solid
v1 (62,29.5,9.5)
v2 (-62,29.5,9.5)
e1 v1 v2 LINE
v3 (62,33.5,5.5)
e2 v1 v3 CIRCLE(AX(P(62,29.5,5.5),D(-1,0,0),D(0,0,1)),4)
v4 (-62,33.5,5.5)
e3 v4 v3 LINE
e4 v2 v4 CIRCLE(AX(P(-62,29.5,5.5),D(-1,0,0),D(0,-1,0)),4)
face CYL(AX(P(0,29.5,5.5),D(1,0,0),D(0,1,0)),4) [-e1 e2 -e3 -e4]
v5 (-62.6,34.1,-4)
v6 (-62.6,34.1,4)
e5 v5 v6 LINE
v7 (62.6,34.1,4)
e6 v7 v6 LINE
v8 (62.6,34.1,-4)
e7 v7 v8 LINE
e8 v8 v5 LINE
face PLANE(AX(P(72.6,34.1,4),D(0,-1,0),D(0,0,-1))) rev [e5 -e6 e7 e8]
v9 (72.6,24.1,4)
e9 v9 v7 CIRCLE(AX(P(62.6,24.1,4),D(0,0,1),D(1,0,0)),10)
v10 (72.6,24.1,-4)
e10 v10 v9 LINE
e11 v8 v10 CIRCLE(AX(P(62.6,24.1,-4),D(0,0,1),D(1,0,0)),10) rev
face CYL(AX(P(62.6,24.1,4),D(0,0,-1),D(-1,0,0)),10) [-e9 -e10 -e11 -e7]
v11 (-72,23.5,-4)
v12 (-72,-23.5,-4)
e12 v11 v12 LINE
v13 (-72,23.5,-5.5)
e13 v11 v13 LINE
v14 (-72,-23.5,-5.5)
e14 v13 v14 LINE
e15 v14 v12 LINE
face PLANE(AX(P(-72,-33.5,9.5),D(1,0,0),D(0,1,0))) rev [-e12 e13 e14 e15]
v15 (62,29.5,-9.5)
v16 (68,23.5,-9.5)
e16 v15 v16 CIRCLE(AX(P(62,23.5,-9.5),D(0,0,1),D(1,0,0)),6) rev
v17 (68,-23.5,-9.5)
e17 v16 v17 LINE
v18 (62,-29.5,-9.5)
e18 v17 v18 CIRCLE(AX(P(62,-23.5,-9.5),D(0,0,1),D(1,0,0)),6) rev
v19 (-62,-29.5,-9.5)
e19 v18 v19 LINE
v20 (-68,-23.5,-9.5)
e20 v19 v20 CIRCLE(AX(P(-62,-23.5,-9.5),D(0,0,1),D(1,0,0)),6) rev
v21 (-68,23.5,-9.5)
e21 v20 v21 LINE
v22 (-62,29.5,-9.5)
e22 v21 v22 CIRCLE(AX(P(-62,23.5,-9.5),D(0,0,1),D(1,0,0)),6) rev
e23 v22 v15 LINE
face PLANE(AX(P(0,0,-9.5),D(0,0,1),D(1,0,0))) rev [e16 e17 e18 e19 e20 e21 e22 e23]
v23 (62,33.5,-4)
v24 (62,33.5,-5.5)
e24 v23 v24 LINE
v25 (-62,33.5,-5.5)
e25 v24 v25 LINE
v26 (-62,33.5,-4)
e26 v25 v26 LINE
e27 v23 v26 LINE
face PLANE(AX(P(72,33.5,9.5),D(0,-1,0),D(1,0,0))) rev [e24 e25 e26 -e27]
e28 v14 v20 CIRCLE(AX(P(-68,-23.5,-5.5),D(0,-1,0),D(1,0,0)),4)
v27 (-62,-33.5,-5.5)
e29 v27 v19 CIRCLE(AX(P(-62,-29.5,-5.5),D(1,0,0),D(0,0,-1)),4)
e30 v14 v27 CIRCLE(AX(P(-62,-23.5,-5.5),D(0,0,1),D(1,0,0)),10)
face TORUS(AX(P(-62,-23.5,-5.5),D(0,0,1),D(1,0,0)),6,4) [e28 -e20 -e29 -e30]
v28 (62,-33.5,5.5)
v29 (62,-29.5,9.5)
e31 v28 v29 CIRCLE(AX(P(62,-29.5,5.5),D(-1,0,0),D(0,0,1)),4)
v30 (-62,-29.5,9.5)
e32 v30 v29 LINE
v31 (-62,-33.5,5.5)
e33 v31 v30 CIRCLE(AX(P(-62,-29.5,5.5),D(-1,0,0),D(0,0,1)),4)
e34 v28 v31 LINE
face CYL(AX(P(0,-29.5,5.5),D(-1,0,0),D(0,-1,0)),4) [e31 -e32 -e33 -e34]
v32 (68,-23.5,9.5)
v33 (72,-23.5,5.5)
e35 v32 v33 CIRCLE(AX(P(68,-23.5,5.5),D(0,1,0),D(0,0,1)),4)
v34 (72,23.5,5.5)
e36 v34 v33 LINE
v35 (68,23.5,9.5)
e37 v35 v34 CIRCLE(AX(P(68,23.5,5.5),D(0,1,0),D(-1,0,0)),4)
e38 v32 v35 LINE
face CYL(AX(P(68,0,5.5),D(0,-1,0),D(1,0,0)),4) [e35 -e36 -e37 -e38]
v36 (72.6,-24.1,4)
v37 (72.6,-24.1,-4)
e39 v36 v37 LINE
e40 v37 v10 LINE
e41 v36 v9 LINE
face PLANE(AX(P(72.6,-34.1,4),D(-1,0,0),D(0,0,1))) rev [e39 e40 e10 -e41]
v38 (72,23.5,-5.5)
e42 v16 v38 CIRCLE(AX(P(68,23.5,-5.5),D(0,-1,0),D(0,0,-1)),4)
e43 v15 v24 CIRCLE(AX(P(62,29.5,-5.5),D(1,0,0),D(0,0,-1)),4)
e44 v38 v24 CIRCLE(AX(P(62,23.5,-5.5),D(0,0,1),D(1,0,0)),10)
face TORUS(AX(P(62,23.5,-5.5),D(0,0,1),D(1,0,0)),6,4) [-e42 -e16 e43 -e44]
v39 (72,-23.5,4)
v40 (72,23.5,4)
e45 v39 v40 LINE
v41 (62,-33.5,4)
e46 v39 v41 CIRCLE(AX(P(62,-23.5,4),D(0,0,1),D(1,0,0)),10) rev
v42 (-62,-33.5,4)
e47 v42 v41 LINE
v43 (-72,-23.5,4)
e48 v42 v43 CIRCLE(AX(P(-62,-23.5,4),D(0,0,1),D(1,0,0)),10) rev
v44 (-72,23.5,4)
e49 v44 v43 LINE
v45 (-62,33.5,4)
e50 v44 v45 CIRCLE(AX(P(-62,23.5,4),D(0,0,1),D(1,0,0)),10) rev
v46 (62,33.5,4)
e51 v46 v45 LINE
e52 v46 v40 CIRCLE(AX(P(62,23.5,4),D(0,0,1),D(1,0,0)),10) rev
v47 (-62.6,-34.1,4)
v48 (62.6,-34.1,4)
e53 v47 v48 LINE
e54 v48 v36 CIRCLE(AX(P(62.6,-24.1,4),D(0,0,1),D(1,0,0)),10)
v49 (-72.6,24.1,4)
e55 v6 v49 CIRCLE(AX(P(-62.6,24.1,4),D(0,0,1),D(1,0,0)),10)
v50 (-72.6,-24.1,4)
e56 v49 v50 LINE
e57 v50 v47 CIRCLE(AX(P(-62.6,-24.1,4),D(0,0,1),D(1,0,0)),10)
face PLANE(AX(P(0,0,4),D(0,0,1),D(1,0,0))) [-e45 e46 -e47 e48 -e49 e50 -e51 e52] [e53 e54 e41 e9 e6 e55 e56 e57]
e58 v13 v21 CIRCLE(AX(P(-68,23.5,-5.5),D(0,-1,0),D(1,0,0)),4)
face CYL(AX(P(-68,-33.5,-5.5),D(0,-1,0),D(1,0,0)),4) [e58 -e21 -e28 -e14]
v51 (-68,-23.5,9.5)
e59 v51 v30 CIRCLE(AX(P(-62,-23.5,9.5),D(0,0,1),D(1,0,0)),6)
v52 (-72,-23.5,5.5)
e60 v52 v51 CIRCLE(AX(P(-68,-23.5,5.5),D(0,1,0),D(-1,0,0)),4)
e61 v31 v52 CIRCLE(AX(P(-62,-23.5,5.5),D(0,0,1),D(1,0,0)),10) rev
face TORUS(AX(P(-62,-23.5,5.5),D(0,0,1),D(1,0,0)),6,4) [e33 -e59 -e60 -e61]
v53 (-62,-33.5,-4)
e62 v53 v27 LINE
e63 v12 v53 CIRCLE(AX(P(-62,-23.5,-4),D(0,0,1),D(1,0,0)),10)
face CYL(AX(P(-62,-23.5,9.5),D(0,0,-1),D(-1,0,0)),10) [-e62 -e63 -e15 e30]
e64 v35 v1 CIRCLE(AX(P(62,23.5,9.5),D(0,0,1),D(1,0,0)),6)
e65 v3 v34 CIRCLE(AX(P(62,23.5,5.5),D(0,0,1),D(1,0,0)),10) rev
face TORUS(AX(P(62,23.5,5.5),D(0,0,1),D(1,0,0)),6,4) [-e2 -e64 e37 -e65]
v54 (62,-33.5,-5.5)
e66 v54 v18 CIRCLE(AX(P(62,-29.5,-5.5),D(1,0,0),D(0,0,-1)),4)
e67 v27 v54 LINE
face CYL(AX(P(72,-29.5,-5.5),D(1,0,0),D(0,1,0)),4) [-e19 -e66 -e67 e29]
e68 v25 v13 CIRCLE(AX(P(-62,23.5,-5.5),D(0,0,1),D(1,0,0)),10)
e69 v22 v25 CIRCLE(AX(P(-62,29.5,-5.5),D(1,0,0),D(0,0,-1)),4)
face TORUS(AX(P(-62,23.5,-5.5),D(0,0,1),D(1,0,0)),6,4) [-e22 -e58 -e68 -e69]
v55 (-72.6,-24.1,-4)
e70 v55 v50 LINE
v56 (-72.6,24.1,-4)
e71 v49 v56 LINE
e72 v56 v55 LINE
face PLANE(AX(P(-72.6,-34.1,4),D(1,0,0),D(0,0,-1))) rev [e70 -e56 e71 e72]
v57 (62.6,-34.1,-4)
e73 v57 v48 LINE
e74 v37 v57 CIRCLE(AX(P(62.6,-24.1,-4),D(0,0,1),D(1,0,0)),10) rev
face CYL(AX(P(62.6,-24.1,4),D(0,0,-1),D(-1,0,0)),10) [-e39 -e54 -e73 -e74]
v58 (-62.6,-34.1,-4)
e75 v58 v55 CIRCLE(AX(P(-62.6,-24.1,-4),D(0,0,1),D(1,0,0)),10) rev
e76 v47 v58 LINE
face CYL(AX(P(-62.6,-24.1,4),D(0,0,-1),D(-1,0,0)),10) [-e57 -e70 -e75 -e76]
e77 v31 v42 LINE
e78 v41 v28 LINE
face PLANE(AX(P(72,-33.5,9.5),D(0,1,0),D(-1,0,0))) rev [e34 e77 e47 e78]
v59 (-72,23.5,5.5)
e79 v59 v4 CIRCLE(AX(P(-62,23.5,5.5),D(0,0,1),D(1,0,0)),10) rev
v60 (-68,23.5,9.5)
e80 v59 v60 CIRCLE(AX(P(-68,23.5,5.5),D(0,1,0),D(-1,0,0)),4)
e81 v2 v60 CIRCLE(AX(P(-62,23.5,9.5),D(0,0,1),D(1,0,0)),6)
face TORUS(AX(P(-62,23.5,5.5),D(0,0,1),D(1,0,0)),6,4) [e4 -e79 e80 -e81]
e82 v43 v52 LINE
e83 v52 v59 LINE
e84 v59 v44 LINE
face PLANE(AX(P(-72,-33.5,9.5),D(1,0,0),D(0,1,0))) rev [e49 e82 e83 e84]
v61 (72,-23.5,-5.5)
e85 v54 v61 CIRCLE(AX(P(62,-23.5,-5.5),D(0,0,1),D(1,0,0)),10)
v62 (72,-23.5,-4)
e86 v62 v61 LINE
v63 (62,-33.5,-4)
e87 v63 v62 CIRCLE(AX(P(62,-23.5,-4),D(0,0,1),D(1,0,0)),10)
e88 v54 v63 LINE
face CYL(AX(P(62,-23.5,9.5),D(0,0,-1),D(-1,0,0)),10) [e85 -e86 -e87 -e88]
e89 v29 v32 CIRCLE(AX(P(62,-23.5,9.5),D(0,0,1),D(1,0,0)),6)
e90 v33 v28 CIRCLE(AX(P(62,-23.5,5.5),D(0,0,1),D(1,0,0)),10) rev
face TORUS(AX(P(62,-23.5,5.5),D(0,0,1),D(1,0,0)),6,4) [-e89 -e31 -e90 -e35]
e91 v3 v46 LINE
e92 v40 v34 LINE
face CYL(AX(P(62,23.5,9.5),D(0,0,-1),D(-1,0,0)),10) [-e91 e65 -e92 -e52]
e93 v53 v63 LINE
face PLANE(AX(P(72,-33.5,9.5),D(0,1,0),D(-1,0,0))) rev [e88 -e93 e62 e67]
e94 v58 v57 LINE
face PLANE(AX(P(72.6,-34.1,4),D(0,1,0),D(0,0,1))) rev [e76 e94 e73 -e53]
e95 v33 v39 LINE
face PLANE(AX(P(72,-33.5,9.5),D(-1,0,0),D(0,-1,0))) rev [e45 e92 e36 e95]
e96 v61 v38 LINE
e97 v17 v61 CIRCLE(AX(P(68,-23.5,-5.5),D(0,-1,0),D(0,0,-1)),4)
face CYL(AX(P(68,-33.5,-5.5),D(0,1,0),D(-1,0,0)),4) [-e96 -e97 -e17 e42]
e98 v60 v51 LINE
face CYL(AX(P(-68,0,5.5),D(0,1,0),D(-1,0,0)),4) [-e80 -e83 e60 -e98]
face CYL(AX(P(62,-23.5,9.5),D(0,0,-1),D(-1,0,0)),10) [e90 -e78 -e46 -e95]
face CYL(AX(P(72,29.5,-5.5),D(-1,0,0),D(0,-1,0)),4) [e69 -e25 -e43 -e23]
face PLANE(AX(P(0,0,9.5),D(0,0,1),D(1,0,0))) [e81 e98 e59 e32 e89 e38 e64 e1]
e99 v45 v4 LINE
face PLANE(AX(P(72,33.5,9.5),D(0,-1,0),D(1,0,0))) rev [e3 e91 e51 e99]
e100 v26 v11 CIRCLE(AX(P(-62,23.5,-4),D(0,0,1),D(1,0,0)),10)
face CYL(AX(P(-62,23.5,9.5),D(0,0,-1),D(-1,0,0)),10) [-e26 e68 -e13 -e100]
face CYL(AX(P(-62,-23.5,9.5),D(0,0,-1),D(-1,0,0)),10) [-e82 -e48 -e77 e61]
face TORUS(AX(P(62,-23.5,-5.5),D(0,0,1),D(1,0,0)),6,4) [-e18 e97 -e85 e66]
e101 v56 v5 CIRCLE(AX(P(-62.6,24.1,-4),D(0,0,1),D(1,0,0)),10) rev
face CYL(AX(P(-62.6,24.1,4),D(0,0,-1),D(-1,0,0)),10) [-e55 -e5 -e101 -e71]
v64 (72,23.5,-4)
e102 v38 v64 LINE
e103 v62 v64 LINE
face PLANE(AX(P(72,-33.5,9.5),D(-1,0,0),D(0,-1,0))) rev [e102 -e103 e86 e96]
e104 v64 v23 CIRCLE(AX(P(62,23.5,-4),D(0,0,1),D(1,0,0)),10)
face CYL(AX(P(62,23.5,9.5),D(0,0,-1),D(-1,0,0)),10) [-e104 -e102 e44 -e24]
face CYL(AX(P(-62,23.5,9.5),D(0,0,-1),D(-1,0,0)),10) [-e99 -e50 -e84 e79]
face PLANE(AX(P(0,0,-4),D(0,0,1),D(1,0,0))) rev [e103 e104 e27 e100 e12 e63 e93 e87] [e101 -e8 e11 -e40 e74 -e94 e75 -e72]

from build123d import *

# Parameters (mm, degrees)
ESQUISSE1_W        = 144
ESQUISSE1_H        = 67
BOSS_EXTRU_1_DEPTH = 9.5
CONG_2_R           = 10
CONG_1_R           = 4
ESQUISSE3_W        = 145.2
ESQUISSE3_H        = 68.2
ESQUISSE3_W_2      = 144
ESQUISSE3_H_2      = 67
BOSS_EXTRU_2_DEPTH = 4
CONG_3_START       = -4
CONG_3_DEPTH       = 8
CONG_3_2_DEPTH     = 8


with BuildPart() as part:
    # Esquisse1 → Boss.-Extru.1 (new, symmetric)
    with BuildSketch(Plane.XY):
        Rectangle(ESQUISSE1_W, ESQUISSE1_H)
    extrude(amount=BOSS_EXTRU_1_DEPTH, both=True)

    # Congé2
    cong_2_edges = [part.edges().sort_by_distance(p)[0] for p in [
        (-72, 33.5, 0),
        (72, 33.5, 0),
        (72, -33.5, 0),
        (-72, -33.5, 0),
    ]]
    fillet(cong_2_edges, radius=CONG_2_R)

    # Congé1
    cong_1_edges = [part.edges().sort_by_distance(p)[0] for p in [
        (0, -33.5, -9.5),
        (0, -33.5, 9.5),
        (-72, 0, -9.5),
        (0, 33.5, -9.5),
        (72, 0, -9.5),
        (69.071067812, 30.571067812, -9.5),
        (69.071067812, -30.571067812, -9.5),
        (-69.071067812, 30.571067812, -9.5),
        (-69.071067812, -30.571067812, -9.5),
        (-72, 0, 9.5),
        (72, 0, 9.5),
        (0, 33.5, 9.5),
        (69.071067812, 30.571067812, 9.5),
        (69.071067812, -30.571067812, 9.5),
        (-69.071067812, 30.571067812, 9.5),
        (-69.071067812, -30.571067812, 9.5),
    ]]
    fillet(cong_1_edges, radius=CONG_1_R)

    # Esquisse3 → Boss.-Extru.2 (add, symmetric)
    with BuildSketch(Plane.XY):
        Rectangle(ESQUISSE3_W, ESQUISSE3_H)
        Rectangle(ESQUISSE3_W_2, ESQUISSE3_H_2, mode=Mode.SUBTRACT)
    extrude(amount=BOSS_EXTRU_2_DEPTH, both=True)

    # Congé3: read off the stored shape, not the designer's step
    # Congé3 outline → Congé3 (cut)
    with BuildSketch(Plane.XY.offset(CONG_3_START)):
        with BuildLine():
            Line((-72.6, 34.1), (-72.6, 24.1))
            ThreePointArc((-72.6, 24.1), (-72.448857802, 25.832050808), (-72, 27.511744422))
            Line((-72, 27.511744422), (-72, 33.5))
            Line((-72, 33.5), (-66.011744422, 33.5))
            ThreePointArc((-66.011744422, 33.5), (-64.332050808, 33.948857802), (-62.6, 34.1))
            Line((-62.6, 34.1), (-72.6, 34.1))
        make_face()
        with BuildLine():
            ThreePointArc((-72, -27.511744422), (-72.448857802, -25.832050808), (-72.6, -24.1))
            Line((-72.6, -24.1), (-72.6, -34.1))
            Line((-72.6, -34.1), (-62.6, -34.1))
            ThreePointArc((-62.6, -34.1), (-64.332050808, -33.948857802), (-66.011744422, -33.5))
            Line((-66.011744422, -33.5), (-72, -33.5))
            Line((-72, -33.5), (-72, -27.511744422))
        make_face()
        with BuildLine():
            Line((72.6, 34.1), (62.6, 34.1))
            ThreePointArc((62.6, 34.1), (64.332050808, 33.948857802), (66.011744422, 33.5))
            Line((66.011744422, 33.5), (72, 33.5))
            Line((72, 33.5), (72, 27.511744422))
            ThreePointArc((72, 27.511744422), (72.448857802, 25.832050808), (72.6, 24.1))
            Line((72.6, 24.1), (72.6, 34.1))
        make_face()
        with BuildLine():
            ThreePointArc((66.011744422, -33.5), (64.332050808, -33.948857802), (62.6, -34.1))
            Line((62.6, -34.1), (72.6, -34.1))
            Line((72.6, -34.1), (72.6, -24.1))
            ThreePointArc((72.6, -24.1), (72.448857802, -25.832050808), (72, -27.511744422))
            Line((72, -27.511744422), (72, -33.5))
            Line((72, -33.5), (66.011744422, -33.5))
        make_face()
    extrude(amount=CONG_3_DEPTH, mode=Mode.SUBTRACT)

    # Cong_3 2 outline → Cong_3 2 (add)
    with BuildSketch(Plane.XY.offset(CONG_3_START)):
        with BuildLine():
            ThreePointArc((-66.011744422, 33.5), (-69.671067812, 31.171067812), (-72, 27.511744422))
            Line((-72, 27.511744422), (-72, 23.5))
            ThreePointArc((-72, 23.5), (-69.071067812, 30.571067812), (-62, 33.5))
            Line((-62, 33.5), (-66.011744422, 33.5))
        make_face()
        with BuildLine():
            Line((-72, -23.5), (-72, -27.511744422))
            ThreePointArc((-72, -27.511744422), (-69.671067812, -31.171067812), (-66.011744422, -33.5))
            Line((-66.011744422, -33.5), (-62, -33.5))
            ThreePointArc((-62, -33.5), (-69.071067812, -30.571067812), (-72, -23.5))
        make_face()
        with BuildLine():
            ThreePointArc((72, 27.511744422), (69.671067812, 31.171067812), (66.011744422, 33.5))
            Line((66.011744422, 33.5), (62, 33.5))
            ThreePointArc((62, 33.5), (69.071067812, 30.571067812), (72, 23.5))
            Line((72, 23.5), (72, 27.511744422))
        make_face()
        with BuildLine():
            Line((62, -33.5), (66.011744422, -33.5))
            ThreePointArc((66.011744422, -33.5), (69.671067812, -31.171067812), (72, -27.511744422))
            Line((72, -27.511744422), (72, -23.5))
            ThreePointArc((72, -23.5), (69.071067812, -30.571067812), (62, -33.5))
        make_face()
    extrude(amount=CONG_3_2_DEPTH)


solid = part.part
